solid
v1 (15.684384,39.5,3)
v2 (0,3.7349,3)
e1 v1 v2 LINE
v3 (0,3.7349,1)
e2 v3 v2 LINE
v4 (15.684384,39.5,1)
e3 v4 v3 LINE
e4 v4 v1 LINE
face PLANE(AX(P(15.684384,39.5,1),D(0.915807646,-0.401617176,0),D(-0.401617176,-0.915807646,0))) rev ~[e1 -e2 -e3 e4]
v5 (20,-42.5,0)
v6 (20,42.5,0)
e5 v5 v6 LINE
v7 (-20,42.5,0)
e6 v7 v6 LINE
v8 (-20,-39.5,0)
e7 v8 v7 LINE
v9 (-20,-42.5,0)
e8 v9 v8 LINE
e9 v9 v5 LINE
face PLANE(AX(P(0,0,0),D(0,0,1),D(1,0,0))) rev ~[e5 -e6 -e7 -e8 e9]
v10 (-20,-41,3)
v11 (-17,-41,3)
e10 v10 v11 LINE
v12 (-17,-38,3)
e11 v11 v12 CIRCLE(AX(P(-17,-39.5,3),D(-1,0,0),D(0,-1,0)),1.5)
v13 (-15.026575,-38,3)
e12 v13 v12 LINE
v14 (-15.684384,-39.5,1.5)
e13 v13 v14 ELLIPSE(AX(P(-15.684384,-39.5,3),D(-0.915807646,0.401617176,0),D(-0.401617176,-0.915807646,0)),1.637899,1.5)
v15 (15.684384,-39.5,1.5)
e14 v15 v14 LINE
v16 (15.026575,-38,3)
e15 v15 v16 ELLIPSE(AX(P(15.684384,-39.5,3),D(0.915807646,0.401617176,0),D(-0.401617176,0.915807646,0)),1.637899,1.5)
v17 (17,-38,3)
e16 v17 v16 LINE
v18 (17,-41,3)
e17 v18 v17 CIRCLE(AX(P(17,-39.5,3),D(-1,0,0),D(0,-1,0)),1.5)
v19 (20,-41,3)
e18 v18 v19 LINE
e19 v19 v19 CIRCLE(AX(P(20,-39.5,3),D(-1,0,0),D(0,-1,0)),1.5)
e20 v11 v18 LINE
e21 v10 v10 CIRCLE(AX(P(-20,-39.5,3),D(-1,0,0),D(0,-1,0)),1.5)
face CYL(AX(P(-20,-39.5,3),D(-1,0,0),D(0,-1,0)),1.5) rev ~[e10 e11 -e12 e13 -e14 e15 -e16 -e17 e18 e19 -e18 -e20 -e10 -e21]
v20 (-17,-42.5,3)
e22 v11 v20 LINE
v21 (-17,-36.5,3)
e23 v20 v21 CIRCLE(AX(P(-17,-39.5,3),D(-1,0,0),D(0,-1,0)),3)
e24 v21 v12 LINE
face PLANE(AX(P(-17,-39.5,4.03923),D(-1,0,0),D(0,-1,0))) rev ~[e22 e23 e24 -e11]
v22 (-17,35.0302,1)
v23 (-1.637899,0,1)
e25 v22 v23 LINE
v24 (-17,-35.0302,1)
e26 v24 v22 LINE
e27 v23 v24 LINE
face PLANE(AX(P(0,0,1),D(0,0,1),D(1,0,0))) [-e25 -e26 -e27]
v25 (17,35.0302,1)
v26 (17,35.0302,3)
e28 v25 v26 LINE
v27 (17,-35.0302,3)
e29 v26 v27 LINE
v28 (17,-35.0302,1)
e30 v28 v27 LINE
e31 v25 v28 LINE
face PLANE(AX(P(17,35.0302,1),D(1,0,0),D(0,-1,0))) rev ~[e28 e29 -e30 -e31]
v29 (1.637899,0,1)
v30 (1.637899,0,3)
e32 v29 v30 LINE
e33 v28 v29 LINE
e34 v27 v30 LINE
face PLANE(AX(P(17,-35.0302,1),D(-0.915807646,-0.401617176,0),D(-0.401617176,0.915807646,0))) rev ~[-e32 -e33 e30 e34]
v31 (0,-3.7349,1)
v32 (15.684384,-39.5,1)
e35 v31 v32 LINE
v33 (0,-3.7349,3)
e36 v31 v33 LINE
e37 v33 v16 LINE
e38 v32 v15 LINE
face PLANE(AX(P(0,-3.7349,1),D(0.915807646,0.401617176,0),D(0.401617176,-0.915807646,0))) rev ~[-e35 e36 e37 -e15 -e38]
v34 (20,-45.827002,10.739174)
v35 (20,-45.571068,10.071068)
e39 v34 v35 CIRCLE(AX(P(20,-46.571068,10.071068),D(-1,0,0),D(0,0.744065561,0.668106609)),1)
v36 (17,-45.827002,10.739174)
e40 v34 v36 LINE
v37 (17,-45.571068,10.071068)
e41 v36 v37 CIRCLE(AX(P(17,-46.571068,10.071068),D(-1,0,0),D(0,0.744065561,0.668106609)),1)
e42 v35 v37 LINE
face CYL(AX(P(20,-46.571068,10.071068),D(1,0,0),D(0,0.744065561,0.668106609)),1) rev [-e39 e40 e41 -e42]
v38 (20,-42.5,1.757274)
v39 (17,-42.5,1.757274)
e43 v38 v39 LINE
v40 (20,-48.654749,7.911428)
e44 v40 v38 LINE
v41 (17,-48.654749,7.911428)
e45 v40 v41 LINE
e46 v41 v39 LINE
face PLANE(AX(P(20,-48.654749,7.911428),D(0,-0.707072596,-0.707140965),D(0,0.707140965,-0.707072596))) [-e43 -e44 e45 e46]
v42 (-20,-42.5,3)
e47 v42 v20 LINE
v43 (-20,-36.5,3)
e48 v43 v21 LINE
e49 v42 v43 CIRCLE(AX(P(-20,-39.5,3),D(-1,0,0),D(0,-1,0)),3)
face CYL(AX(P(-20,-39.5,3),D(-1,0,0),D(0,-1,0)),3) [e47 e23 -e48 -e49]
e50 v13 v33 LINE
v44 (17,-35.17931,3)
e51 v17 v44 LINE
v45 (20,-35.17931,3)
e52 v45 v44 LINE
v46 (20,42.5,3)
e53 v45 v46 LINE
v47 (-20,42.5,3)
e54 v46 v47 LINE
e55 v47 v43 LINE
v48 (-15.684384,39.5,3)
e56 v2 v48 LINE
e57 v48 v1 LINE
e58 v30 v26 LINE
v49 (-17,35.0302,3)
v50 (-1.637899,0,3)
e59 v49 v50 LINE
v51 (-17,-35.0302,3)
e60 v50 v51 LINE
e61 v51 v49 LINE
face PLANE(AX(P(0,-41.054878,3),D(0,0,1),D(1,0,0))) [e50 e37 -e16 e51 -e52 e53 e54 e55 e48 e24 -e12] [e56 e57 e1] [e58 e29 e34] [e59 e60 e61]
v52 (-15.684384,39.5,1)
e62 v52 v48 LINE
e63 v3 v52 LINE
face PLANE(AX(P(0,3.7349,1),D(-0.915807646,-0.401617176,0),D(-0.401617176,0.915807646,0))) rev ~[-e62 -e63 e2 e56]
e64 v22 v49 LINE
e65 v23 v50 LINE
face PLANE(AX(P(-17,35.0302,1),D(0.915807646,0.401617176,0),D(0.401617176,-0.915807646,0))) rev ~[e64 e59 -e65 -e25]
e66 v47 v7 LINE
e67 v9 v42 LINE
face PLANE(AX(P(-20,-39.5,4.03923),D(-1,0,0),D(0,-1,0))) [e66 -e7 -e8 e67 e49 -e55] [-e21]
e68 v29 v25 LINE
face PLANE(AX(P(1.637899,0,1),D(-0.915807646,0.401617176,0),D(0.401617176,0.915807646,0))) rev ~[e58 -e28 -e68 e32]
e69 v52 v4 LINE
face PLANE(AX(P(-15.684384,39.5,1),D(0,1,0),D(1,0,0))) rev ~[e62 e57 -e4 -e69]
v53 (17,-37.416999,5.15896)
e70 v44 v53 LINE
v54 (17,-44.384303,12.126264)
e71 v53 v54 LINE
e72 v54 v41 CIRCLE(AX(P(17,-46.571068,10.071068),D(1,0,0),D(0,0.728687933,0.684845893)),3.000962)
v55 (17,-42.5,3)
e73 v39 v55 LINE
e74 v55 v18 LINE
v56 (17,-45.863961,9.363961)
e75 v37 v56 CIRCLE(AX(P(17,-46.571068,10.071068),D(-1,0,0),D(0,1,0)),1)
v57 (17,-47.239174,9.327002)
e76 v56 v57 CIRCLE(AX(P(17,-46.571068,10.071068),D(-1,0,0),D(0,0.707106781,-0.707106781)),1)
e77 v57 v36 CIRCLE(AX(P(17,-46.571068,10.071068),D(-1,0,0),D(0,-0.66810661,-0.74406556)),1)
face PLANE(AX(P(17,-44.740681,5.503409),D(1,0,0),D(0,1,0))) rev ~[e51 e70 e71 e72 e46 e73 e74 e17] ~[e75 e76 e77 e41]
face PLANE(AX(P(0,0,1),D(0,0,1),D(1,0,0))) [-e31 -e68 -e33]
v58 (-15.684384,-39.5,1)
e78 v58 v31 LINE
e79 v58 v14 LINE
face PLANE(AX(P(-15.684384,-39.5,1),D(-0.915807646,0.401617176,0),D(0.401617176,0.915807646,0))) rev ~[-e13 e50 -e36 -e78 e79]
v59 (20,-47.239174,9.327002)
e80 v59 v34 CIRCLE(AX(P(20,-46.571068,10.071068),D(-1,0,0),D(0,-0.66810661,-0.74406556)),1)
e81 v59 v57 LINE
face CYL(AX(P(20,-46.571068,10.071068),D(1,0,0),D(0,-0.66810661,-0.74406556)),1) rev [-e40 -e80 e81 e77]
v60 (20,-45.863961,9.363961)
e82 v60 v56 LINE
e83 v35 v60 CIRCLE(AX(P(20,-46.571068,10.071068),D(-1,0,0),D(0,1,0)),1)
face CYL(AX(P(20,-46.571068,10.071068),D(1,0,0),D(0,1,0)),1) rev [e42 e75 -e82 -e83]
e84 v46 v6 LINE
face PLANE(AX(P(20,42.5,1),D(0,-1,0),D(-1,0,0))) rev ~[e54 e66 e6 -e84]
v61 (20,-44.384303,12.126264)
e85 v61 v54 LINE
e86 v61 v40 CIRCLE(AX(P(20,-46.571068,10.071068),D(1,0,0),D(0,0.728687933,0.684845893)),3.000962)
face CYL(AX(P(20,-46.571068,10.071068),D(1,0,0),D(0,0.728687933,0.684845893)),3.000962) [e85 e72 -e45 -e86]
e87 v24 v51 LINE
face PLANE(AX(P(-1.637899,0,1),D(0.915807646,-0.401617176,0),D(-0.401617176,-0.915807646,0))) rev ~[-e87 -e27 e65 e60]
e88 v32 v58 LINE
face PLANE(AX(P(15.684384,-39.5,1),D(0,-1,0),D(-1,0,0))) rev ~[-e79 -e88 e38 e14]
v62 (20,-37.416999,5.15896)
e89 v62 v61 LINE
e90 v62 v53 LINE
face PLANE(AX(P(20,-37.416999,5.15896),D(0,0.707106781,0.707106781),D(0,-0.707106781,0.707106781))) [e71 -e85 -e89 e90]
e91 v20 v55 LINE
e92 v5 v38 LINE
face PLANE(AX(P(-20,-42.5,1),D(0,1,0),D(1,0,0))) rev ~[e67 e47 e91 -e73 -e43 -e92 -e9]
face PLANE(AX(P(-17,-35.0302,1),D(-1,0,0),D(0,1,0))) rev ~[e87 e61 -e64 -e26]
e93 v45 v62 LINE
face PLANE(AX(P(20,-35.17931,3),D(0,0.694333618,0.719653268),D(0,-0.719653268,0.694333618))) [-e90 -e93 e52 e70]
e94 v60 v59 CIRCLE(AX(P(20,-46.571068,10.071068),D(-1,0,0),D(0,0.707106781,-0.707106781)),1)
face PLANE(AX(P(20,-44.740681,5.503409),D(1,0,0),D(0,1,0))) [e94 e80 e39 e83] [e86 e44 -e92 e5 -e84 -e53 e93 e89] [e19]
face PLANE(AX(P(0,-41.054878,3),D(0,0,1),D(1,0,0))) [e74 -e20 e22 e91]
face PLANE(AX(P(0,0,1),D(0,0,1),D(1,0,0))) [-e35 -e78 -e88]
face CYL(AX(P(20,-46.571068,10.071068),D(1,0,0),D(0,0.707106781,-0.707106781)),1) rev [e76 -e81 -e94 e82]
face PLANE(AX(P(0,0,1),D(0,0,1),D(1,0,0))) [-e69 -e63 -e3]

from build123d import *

# Parameters (mm, degrees)
F0_W      = 40
F0_H      = 85
F1_DEPTH  = 1
F2_W      = 3
F2_H      = 3
F3_DEPTH  = 2
F5_DEPTH  = 3
F7_DEPTH  = 3
F9_R      = 1.5
F10_DEPTH = 45


with BuildPart() as f1:
    # F0 (on Top) → F1 (new body)
    with BuildSketch(Plane.XY):
        Rectangle(F0_W, F0_H)
    extrude(amount=F1_DEPTH)

    # F2 (on face) → F3 (join)
    with BuildSketch(Plane.XY.offset(1)):
        Polygon((-17, -42.5), (17, -42.5), (15.6843836329, -39.5), (-15.6843836329, -39.5), align=None)
        Polygon((-17, -39.5), (-17, -42.5), (-15.6843836329, -39.5), align=None)
        with Locations((-18.5, -41)):
            Rectangle(F2_W, F2_H)
        Polygon((15.6843836329, -39.5), (17, -42.5), (17, -39.5), align=None)
        with Locations((18.5, -41)):
            Rectangle(F2_W, F2_H)
        Polygon((17, -35.0301999523), (17, -39.5), (20, -39.5), (20, 39.5), (17, 39.5), (17, 35.0301999523), align=None)
        Polygon((15.6843836329, -39.5), (17, -39.5), (17, -35.0301999523), (1.6378985336, 0), (0, -3.7349000238), align=None)
        Polygon((-15.6843836329, -39.5), (0, -3.7349000238), (-1.6378985336, 0), (-17, -35.0301999523), (-17, -39.5), align=None)
        Polygon((-20, -39.5), (-17, -39.5), (-17, -35.0301999523), (-17, 35.0301999523), (-17, 39.5), (-20, 39.5), align=None)
        Polygon((-1.6378985336, 0), (0, -3.7349000238), (1.6378985336, 0), (0, 3.7349000238), align=None)
        Polygon((-17, 35.0301999523), (-1.6378985336, 0), (0, 3.7349000238), (-15.6843836329, 39.5), (-17, 39.5), align=None)
        Polygon((1.6378985336, 0), (17, 35.0301999523), (17, 39.5), (15.6843836329, 39.5), (0, 3.7349000238), align=None)
        with Locations((-18.5, 41)):
            Rectangle(F2_W, F2_H)
        Polygon((-17, 39.5), (-15.6843836329, 39.5), (-17, 42.5), align=None)
        Polygon((15.6843836329, 39.5), (17, 42.5), (-17, 42.5), (-15.6843836329, 39.5), align=None)
        Polygon((15.6843836329, 39.5), (17, 39.5), (17, 42.5), align=None)
        with Locations((18.5, 41)):
            Rectangle(F2_W, F2_H)
    extrude(amount=F3_DEPTH)

    # F4 (on face) → F5 (join)
    with BuildSketch(Plane.YZ.offset(20)):
        with BuildLine():
            ThreePointArc((-42.5, 3), (-42.2716385975, 4.1480502971), (-41.6213203436, 5.1213203436))
            Line((-41.6213203436, 5.1213203436), (-44.4490675498, 7.9490675498))
            ThreePointArc((-44.4490675498, 7.9490675498), (-46.5442111918, 7.0702264387), (-48.6547486938, 7.9114279791))
            Line((-48.6547486938, 7.9114279791), (-42.5, 1.7572743533))
            Line((-42.5, 1.7572743533), (-42.5, 3))
        make_face()
        with BuildLine():
            Line((-39.5, 3), (-36.5, 3))
            ThreePointArc((-36.5, 3), (-36.7387500509, 4.1728165749), (-37.4169991456, 5.1589598052))
            ThreePointArc((-37.4169991456, 5.1589598052), (-39.5268566208, 5.9998797846), (-41.6213203436, 5.1213203436))
            Line((-41.6213203436, 5.1213203436), (-39.5, 3))
        make_face()
        with BuildLine():
            Line((-42.5, 3), (-39.5, 3))
            Line((-39.5, 3), (-41.6213203436, 5.1213203436))
            ThreePointArc((-41.6213203436, 5.1213203436), (-42.2716385975, 4.1480502971), (-42.5, 3))
        make_face()
        with BuildLine():
            ThreePointArc((-37.4169991456, 5.1589598052), (-36.7387500509, 4.1728165749), (-36.5, 3))
            Line((-36.5, 3), (-35.1793104616, 3))
            Line((-35.1793104616, 3), (-37.4169991456, 5.1589598052))
        make_face()
        with BuildLine():
            ThreePointArc((-41.6213203436, 5.1213203436), (-39.5268566208, 5.9998797846), (-37.4169991456, 5.1589598052))
            Line((-37.4169991456, 5.1589598052), (-44.3843033436, 12.1262640032))
            ThreePointArc((-44.3843033436, 12.1262640032), (-43.7810708304, 11.1763673496), (-43.5701062619, 10.0710678119))
            ThreePointArc((-43.5701062619, 10.0710678119), (-43.798540858, 8.9226495455), (-44.4490675498, 7.9490675498))
            Line((-44.4490675498, 7.9490675498), (-41.6213203436, 5.1213203436))
        make_face()
        with BuildLine():
            ThreePointArc((-43.5701062619, 10.0710678119), (-43.7810708304, 11.1763673496), (-44.3843033436, 12.1262640032))
            Line((-44.3843033436, 12.1262640032), (-44.4121080066, 12.1540686663))
            Line((-44.4121080066, 12.1540686663), (-45.8270022514, 10.7391744215))
            ThreePointArc((-45.8270022514, 10.7391744215), (-45.6372408578, 10.4287928736), (-45.5710678119, 10.0710678119))
            ThreePointArc((-45.5710678119, 10.0710678119), (-45.6471882794, 9.6883843795), (-45.8639610307, 9.3639610307))
            Line((-45.8639610307, 9.3639610307), (-44.4490675498, 7.9490675498))
            ThreePointArc((-44.4490675498, 7.9490675498), (-43.798540858, 8.9226495455), (-43.5701062619, 10.0710678119))
        make_face()
        with BuildLine():
            ThreePointArc((-48.6547486938, 7.9114279791), (-46.5442111918, 7.0702264387), (-44.4490675498, 7.9490675498))
            Line((-44.4490675498, 7.9490675498), (-45.8639610307, 9.3639610307))
            ThreePointArc((-45.8639610307, 9.3639610307), (-46.5442025706, 9.0714287476), (-47.2391744215, 9.3270022514))
            Line((-47.2391744215, 9.3270022514), (-48.6547486938, 7.9114279791))
        make_face()
        with BuildLine():
            Line((-44.4121080066, 12.1540686663), (-44.3843033436, 12.1262640032))
            ThreePointArc((-44.3843033436, 12.1262640032), (-48.6791160167, 12.2069289943), (-48.6547486938, 7.9114279791))
            Line((-48.6547486938, 7.9114279791), (-47.2391744215, 9.3270022514))
            ThreePointArc((-47.2391744215, 9.3270022514), (-47.2781745931, 10.7781745931), (-45.8270022514, 10.7391744215))
            Line((-45.8270022514, 10.7391744215), (-44.4121080066, 12.1540686663))
        make_face()
    extrude(amount=-F5_DEPTH)

    # F6 (on face) → F7 (join)
    with BuildSketch(Plane(origin=(-20, 0, 0), x_dir=(0, -1, 0), z_dir=(-1, 0, 0))):
        with BuildLine():
            Line((36.5, 3), (42.5, 3))
            ThreePointArc((42.5, 3), (39.5, 6), (36.5, 3))
        make_face()
        with BuildLine():
            ThreePointArc((39.5000000598, 0), (41.6213203647, 0.8786796776), (42.5, 3))
            Line((42.5, 3), (36.5, 3))
            ThreePointArc((36.5, 3), (37.3786796776, 0.8786796353), (39.5000000598, 0))
        make_face()
    extrude(amount=-F7_DEPTH)

    # F8: union 

    # F9 (on face) → F10 (cut)
    with BuildSketch(Plane(origin=(-20, 0, 0), x_dir=(0, -1, 0), z_dir=(-1, 0, 0))):
        with Locations((39.5, 3)):
            Circle(F9_R)
    extrude(amount=-F10_DEPTH, mode=Mode.SUBTRACT)


solid = f1.part
